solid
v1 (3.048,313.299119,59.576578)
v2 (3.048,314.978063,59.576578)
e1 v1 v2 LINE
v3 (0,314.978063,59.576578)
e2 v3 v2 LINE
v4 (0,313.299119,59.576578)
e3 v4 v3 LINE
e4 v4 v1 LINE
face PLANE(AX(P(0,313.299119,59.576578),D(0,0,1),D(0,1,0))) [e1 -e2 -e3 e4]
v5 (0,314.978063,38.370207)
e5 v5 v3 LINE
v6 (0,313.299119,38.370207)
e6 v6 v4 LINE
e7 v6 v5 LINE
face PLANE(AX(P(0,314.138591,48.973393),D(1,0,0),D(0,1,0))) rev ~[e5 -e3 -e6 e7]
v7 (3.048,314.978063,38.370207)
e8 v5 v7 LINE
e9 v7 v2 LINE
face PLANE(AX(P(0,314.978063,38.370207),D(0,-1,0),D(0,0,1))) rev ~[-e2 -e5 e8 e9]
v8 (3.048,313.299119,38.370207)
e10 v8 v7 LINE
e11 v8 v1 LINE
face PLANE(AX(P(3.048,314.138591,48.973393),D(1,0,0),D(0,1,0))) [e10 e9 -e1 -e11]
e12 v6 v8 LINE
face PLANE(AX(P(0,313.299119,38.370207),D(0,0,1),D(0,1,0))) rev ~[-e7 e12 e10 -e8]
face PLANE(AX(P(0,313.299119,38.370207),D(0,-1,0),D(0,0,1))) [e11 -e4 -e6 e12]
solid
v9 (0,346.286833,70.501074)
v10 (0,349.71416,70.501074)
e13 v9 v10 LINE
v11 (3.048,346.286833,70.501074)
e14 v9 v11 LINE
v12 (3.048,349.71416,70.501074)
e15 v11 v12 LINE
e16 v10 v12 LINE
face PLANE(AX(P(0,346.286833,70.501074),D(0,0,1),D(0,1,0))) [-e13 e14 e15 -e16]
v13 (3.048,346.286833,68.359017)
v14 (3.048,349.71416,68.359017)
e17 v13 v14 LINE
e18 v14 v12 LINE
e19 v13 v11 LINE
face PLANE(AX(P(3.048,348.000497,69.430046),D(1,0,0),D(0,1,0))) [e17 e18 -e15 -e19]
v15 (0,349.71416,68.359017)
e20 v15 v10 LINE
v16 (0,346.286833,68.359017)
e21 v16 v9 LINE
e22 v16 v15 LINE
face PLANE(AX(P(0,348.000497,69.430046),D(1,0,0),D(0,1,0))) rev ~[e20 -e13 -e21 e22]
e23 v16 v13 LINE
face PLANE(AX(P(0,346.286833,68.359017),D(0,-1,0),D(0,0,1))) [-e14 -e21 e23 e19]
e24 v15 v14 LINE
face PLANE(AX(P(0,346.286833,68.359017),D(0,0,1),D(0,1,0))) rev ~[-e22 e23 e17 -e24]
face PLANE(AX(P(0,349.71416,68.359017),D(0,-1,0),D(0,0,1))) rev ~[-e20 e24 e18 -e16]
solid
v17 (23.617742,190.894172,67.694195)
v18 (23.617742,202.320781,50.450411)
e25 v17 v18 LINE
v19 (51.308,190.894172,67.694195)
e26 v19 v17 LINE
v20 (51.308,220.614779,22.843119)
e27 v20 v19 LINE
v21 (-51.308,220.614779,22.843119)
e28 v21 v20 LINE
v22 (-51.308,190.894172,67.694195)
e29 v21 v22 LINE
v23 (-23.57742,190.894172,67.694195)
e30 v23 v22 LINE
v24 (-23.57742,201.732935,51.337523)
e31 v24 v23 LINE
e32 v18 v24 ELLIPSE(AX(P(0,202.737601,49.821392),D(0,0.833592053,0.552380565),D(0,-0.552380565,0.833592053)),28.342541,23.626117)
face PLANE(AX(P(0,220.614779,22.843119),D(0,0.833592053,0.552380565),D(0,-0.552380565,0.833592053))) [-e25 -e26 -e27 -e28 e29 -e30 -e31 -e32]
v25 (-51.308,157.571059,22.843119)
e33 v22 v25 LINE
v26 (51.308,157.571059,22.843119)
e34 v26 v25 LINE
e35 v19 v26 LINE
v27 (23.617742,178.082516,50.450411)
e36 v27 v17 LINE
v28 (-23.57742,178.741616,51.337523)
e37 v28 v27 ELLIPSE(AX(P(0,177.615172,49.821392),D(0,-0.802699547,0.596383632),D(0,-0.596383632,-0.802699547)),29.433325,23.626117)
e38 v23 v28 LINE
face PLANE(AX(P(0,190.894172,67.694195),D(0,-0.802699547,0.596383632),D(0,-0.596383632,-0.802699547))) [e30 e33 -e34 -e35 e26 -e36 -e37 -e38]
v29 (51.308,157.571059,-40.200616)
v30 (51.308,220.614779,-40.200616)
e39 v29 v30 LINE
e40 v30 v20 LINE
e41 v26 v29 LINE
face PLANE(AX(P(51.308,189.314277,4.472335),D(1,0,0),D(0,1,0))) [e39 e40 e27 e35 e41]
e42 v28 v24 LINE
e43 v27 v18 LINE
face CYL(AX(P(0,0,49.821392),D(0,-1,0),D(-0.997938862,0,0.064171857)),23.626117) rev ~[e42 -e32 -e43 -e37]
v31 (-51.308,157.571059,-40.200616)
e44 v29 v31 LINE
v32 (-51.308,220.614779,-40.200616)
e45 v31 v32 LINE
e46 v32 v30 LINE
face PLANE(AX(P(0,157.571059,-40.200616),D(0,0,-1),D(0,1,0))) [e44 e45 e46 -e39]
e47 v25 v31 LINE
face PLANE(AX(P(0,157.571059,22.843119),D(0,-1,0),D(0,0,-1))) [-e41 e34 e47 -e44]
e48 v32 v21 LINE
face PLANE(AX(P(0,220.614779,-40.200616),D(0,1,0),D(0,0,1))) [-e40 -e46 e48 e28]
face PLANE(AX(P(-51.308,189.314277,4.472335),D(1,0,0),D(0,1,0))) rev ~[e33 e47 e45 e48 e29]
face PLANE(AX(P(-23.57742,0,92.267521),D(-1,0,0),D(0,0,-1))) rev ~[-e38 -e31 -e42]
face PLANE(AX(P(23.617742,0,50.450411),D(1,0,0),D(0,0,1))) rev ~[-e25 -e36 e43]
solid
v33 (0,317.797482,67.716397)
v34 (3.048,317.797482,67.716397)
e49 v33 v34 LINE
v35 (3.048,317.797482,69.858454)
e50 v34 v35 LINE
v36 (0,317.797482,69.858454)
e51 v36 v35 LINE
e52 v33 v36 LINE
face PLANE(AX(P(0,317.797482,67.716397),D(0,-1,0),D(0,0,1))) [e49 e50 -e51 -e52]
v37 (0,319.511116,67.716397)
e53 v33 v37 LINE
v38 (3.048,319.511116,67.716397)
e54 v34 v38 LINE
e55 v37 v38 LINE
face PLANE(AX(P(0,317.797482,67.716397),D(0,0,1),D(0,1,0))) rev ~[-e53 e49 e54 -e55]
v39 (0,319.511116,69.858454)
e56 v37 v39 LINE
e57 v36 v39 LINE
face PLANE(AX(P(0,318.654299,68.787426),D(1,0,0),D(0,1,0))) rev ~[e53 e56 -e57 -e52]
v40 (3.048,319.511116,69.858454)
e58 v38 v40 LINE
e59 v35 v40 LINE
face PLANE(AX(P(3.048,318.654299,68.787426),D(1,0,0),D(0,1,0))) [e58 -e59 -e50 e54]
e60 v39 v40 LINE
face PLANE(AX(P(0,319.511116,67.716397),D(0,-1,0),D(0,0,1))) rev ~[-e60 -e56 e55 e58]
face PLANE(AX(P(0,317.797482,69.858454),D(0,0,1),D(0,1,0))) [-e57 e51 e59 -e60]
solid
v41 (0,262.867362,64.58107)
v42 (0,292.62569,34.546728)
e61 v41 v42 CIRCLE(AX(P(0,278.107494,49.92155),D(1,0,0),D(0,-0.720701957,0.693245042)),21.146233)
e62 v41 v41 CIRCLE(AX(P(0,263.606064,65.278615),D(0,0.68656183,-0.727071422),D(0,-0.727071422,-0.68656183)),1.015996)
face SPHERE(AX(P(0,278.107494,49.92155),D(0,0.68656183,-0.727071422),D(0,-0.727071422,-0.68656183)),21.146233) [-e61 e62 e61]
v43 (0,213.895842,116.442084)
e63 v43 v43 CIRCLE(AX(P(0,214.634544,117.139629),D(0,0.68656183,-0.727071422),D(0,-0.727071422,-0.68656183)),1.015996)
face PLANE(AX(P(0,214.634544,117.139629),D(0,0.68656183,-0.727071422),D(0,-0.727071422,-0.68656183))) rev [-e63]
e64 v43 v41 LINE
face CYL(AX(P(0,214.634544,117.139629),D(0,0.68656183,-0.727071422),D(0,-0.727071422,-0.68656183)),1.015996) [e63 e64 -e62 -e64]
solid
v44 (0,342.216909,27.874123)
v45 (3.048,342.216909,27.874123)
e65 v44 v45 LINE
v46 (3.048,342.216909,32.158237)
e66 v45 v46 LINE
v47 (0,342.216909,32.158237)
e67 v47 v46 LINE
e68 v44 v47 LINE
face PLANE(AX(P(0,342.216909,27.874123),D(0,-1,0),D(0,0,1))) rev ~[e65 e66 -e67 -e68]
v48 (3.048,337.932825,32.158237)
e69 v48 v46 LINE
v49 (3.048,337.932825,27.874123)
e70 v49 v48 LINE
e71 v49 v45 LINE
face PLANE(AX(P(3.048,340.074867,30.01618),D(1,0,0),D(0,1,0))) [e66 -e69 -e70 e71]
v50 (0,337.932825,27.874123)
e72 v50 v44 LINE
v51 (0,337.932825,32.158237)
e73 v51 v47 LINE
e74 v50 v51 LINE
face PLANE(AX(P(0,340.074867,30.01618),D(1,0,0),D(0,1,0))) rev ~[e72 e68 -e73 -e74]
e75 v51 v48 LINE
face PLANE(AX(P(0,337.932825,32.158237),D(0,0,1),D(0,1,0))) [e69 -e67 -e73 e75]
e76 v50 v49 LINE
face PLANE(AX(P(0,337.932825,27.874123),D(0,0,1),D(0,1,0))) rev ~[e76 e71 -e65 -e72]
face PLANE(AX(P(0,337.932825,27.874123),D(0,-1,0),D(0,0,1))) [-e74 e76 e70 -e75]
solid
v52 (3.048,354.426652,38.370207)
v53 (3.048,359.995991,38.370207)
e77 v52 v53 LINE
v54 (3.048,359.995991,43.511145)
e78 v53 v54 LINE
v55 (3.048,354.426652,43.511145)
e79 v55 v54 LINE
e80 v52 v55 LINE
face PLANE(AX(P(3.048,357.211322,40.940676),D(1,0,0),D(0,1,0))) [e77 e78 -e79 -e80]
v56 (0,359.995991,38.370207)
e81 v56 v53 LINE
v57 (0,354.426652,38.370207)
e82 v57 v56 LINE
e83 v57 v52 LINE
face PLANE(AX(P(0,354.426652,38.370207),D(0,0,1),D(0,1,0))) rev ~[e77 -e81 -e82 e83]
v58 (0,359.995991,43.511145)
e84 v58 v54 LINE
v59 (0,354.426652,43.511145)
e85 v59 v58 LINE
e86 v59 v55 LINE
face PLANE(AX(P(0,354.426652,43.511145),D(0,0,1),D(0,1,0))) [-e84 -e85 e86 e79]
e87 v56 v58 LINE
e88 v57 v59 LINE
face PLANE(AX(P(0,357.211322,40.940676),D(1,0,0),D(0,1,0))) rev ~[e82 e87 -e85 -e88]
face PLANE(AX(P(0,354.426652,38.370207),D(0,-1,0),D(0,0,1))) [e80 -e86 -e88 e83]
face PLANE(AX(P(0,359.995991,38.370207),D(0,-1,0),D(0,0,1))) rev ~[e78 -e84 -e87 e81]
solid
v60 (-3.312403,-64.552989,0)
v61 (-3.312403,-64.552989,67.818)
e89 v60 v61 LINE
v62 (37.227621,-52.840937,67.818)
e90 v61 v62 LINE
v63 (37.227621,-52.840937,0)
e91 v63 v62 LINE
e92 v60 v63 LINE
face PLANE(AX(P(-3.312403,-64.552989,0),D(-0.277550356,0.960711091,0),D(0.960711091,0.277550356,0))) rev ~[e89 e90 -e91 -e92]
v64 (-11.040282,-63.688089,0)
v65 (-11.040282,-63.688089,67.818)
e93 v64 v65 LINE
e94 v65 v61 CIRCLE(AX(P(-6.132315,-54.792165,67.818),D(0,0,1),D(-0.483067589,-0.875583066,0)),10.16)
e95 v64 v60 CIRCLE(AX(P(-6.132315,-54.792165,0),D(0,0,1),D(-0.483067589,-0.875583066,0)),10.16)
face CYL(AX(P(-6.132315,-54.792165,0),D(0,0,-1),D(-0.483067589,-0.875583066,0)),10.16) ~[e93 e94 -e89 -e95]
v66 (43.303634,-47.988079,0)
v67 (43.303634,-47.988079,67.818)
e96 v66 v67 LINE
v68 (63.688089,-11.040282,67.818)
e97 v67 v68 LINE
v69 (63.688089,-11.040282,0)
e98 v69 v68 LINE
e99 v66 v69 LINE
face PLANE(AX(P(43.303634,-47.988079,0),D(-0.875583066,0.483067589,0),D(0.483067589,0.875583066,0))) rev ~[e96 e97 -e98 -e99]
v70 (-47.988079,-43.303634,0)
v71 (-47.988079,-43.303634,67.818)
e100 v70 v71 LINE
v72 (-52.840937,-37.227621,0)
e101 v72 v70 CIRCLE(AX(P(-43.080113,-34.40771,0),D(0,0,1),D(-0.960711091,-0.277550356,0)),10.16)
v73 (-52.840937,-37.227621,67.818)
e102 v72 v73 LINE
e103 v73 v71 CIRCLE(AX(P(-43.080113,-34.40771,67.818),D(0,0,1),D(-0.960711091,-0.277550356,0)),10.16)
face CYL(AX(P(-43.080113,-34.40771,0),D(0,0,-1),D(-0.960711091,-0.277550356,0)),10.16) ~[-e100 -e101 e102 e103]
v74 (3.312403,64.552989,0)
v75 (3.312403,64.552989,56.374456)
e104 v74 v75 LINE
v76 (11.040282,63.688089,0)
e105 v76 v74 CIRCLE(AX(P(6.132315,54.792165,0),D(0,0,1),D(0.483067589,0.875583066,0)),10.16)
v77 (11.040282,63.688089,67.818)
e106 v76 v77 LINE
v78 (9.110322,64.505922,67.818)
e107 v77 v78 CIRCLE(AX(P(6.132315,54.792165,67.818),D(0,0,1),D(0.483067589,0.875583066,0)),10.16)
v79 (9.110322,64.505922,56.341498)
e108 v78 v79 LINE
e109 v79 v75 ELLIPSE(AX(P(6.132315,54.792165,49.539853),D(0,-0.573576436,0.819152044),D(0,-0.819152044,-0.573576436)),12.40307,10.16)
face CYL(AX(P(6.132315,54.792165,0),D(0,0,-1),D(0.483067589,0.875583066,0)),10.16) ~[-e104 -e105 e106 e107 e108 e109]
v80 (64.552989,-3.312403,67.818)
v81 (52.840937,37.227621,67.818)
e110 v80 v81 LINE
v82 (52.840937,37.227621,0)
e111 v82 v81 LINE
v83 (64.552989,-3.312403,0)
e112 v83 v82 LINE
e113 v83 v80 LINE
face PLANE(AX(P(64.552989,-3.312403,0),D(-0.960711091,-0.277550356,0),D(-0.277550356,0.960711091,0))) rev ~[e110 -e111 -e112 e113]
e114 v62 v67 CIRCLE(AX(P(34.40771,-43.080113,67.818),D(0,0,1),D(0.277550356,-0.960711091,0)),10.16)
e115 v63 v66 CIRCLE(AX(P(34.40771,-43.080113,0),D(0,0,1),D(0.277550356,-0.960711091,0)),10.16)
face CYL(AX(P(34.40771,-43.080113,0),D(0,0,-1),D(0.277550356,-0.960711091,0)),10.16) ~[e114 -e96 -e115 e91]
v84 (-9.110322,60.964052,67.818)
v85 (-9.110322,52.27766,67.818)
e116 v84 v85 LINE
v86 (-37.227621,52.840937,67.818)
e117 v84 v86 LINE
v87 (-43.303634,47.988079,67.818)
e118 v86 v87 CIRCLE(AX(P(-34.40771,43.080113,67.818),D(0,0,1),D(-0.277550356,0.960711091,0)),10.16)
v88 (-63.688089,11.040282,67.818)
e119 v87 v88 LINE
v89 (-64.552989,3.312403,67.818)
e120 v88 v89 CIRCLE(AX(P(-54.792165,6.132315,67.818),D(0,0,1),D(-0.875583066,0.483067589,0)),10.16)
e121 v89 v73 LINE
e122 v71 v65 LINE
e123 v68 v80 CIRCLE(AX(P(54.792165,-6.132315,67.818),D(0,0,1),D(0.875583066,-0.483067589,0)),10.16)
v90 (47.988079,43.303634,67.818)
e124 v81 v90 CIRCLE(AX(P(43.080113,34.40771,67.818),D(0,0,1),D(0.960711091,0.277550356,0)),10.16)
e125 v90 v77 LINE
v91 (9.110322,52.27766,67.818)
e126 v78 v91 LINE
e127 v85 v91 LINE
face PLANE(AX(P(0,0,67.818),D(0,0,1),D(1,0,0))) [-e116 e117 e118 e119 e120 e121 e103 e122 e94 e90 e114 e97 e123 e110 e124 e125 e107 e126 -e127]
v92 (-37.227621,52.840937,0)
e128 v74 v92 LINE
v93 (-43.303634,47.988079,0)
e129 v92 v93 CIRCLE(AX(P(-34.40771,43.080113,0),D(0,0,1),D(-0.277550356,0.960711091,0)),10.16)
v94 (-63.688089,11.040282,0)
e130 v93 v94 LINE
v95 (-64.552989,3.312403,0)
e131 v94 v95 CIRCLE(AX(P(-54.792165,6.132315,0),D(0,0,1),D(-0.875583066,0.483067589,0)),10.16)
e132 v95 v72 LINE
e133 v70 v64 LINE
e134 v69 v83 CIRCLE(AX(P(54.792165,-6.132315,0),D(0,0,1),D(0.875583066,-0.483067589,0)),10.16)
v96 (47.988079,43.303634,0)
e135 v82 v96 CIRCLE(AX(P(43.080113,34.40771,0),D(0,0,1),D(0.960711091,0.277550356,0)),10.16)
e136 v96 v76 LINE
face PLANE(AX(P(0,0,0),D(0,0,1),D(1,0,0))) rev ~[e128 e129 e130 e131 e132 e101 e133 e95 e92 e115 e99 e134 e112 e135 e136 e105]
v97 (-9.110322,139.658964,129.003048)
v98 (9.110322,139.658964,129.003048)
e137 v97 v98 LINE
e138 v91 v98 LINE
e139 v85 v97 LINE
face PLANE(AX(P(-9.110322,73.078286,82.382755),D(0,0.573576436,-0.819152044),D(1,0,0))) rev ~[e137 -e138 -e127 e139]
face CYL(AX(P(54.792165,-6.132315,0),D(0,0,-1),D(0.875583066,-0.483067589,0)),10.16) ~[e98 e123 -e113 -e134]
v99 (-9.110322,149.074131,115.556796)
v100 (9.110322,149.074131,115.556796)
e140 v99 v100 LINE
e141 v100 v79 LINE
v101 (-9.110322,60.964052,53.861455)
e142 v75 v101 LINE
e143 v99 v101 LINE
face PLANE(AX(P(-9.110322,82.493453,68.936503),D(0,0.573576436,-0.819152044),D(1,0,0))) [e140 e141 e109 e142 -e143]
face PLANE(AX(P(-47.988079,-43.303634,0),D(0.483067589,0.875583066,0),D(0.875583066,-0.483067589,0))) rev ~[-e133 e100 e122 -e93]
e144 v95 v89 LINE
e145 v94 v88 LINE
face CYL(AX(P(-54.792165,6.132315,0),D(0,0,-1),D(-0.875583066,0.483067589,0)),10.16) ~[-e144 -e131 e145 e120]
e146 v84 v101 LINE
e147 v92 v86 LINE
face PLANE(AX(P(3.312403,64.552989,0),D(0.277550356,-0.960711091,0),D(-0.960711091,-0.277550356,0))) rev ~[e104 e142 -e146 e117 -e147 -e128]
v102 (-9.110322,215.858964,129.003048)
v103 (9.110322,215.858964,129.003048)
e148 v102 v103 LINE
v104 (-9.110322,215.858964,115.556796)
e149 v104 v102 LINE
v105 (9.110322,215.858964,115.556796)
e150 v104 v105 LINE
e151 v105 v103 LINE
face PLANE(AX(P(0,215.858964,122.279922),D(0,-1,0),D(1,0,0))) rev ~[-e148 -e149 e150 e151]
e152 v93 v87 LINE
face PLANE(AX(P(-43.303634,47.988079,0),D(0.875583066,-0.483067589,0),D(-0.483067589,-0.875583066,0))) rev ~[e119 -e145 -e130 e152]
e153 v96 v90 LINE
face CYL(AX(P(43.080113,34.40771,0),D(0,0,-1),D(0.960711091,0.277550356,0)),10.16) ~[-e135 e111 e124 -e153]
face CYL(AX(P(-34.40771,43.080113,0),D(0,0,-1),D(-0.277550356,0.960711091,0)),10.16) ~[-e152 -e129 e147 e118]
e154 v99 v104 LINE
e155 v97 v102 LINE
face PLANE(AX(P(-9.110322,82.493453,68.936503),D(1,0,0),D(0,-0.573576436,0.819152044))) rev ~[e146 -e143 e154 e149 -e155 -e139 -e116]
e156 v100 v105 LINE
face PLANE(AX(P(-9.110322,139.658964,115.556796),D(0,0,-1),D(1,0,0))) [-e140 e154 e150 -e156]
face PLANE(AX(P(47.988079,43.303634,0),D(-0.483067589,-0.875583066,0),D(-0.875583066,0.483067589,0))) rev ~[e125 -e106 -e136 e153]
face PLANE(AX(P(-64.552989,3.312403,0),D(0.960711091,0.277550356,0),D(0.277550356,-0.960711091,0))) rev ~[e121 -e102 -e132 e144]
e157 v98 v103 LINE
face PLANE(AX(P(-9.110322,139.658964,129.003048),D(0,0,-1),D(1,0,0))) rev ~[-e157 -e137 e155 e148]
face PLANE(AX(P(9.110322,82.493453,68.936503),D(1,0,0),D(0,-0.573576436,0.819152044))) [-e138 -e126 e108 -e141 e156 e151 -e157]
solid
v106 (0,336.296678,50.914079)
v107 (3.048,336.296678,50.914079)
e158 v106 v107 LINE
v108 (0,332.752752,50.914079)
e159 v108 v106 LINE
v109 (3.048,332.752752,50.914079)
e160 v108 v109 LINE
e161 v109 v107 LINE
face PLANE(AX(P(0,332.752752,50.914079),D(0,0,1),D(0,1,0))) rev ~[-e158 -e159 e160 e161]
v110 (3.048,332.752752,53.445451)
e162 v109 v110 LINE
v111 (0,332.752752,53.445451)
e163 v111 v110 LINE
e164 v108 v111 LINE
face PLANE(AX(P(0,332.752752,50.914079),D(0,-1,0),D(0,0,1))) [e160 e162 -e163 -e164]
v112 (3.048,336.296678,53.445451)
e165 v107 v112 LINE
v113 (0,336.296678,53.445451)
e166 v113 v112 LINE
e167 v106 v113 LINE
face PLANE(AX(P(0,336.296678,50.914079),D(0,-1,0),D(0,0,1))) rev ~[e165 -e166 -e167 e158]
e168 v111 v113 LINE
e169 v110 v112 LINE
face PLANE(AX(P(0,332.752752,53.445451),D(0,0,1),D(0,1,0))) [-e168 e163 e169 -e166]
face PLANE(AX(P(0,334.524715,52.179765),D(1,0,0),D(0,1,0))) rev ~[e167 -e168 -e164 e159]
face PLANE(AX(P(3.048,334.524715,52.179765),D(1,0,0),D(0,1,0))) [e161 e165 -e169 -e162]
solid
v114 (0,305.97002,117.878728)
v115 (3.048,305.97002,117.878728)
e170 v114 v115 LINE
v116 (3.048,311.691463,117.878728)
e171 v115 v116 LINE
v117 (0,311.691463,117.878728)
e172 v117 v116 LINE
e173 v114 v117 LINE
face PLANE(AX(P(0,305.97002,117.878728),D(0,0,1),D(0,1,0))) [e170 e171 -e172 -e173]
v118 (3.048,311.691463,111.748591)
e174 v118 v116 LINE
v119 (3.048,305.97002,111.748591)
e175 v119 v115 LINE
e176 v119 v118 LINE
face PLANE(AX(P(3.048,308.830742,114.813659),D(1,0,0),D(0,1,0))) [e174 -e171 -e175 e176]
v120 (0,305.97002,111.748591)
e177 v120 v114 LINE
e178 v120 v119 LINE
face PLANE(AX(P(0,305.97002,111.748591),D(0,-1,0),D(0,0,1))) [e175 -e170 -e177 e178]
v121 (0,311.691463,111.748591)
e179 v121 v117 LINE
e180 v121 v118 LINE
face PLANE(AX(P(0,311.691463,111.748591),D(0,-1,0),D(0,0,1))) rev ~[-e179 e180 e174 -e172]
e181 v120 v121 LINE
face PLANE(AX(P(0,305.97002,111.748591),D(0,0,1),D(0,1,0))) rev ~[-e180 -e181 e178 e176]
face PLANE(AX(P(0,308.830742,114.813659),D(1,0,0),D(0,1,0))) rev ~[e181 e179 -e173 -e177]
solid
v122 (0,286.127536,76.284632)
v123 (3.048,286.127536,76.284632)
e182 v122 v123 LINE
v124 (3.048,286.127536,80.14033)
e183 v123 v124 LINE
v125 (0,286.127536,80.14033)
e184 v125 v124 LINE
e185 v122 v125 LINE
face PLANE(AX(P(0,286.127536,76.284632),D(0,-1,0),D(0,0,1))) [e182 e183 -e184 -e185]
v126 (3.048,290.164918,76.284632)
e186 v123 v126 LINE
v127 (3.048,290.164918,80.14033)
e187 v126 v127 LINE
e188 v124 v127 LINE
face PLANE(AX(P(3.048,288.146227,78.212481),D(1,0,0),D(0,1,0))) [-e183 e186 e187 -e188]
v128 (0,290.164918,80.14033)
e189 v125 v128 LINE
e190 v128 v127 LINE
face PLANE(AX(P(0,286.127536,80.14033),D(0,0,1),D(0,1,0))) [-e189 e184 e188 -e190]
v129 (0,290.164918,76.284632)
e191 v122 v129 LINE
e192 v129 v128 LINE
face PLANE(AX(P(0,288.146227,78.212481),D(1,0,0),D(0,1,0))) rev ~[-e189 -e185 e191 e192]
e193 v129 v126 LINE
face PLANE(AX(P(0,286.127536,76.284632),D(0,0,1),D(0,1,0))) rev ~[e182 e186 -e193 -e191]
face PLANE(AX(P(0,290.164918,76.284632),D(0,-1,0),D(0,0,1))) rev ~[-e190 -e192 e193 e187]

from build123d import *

# Parameters (mm, degrees)
F1_DEPTH      = 67.818
F4_W          = 18.2206444442
F4_H          = 16.4148422464
F5_DEPTH      = 35.052
F5_DEPTH_BACK = 81.28
F7_W          = 18.2206444442
F7_H          = 13.4462515828
F8_DEPTH      = 76.2
F12_DEPTH     = 51.308
F14_DEPTH     = 307.34
F15_W         = 3.5439252173
F15_H         = 2.5313720107
F16_DEPTH     = 3.048
F15_W_2       = 5.5693387985
F15_H_2       = 5.1409378648
F15_W_3       = 4.2840838432
F15_H_3       = 4.2841136456
F15_W_4       = 1.7136335373
F15_H_4       = 2.1420568228
F15_W_5       = 1.678943634
F15_H_5       = 21.2063714862
F15_W_6       = 4.0373813916
F15_H_6       = 3.8556978106
F15_W_7       = 3.4273266792
F15_W_8       = 5.7214427742
F15_H_7       = 6.1301365495


with BuildPart() as f1:
    # F0 (on Top) → F1 (new body)
    with BuildSketch(Plane.XY):
        with BuildLine():
            Line((-3.3124033153, -64.5529893688), (37.227621348, -52.8409373586))
            ThreePointArc((37.227621348, -52.8409373586), (40.7482742502, -51.0188053655), (43.3036336822, -47.9880793748))
            Line((43.3036336822, -47.9880793748), (63.6880886331, -11.0402816279))
            ThreePointArc((63.6880886331, -11.0402816279), (64.8891242859, -7.262362198), (64.5529893688, -3.3124033153))
            Line((64.5529893688, -3.3124033153), (52.8409373586, 37.227621348))
            ThreePointArc((52.8409373586, 37.227621348), (51.0188053655, 40.7482742502), (47.9880793748, 43.3036336822))
            Line((47.9880793748, 43.3036336822), (11.0402816279, 63.6880886331))
            ThreePointArc((11.0402816279, 63.6880886331), (7.262362198, 64.8891242859), (3.3124033153, 64.5529893688))
            Line((3.3124033153, 64.5529893688), (-37.227621348, 52.8409373586))
            ThreePointArc((-37.227621348, 52.8409373586), (-40.7482742502, 51.0188053655), (-43.3036336822, 47.9880793748))
            Line((-43.3036336822, 47.9880793748), (-63.6880886331, 11.0402816279))
            ThreePointArc((-63.6880886331, 11.0402816279), (-64.8891242859, 7.262362198), (-64.5529893688, 3.3124033153))
            Line((-64.5529893688, 3.3124033153), (-52.8409373586, -37.227621348))
            ThreePointArc((-52.8409373586, -37.227621348), (-51.0188053655, -40.7482742502), (-47.9880793748, -43.3036336822))
            Line((-47.9880793748, -43.3036336822), (-11.0402816279, -63.6880886331))
            ThreePointArc((-11.0402816279, -63.6880886331), (-7.262362198, -64.8891242859), (-3.3124033153, -64.5529893688))
        make_face()
    extrude(amount=F1_DEPTH)

    # F4 (on line) → F5 (join, two sides)
    with BuildSketch(Plane(origin=(0, 87.7434991713, 61.4386595487), x_dir=(1, 0, 0), z_dir=(0, -0.8191520443, -0.5735764364))) as f5_sk:
        with Locations((0, 17.3605981536)):
            Rectangle(F4_W, F4_H)
    extrude(amount=F5_DEPTH)
    extrude(f5_sk.sketch, amount=-F5_DEPTH_BACK)

    # F7 (on plane+point) → F8 (join)
    with BuildSketch(Plane.XZ.offset(-139.6589639498)):
        with Locations((0, 122.2799217629)):
            Rectangle(F7_W, F7_H)
    extrude(amount=-F8_DEPTH)


with BuildPart() as f10:
    # F9 (on Right) → F10 (revolve)
    with BuildSketch(Plane.YZ):
        with BuildLine():
            Line((213.895842433, 116.4420843124), (262.8673623017, 64.581070459))
            ThreePointArc((262.8673623017, 64.581070459), (263.0859847021, 35.038088053), (292.6256896875, 34.5467281301))
            Line((292.6256896875, 34.5467281301), (278.1074935259, 49.9215495422))
            Line((278.1074935259, 49.9215495422), (214.6345443587, 117.1396286399))
            Line((214.6345443587, 117.1396286399), (213.895842433, 116.4420843124))
        make_face()
    revolve(axis=Axis((0, 246.3710189423, 83.5305890911), (0, 0.6865618304, -0.7270714222)))


with BuildPart() as f12:
    # F11 (on Right) → F12 (new body, symmetric)
    with BuildSketch(Plane.YZ):
        Polygon((157.5710592777, -40.2006159251), (220.6147791832, -40.2006159251), (220.6147791832, 22.8431193803), (190.8941715956, 67.6941946149), (157.5710592777, 22.8431193803), align=None)
    extrude(amount=F12_DEPTH, both=True)

    # F13 (on Front) → F14 (cut)
    with BuildSketch(Plane.XZ):
        with BuildLine():
            Line((-23.5774199521, 92.2675209238), (-23.5774199521, 51.3375234856))
            ThreePointArc((-23.5774199521, 51.3375234856), (-0.4440142616, 26.1994476979), (23.6177416804, 50.4504108568))
            Line((23.6177416804, 50.4504108568), (23.6177416804, 86.8789901563))
            Line((23.6177416804, 86.8789901563), (-23.5774199521, 92.2675209238))
        make_face()
    extrude(amount=-F14_DEPTH, mode=Mode.SUBTRACT)


with BuildPart() as f16:
    # F15 (on Right) → F16 (new body)
    with BuildSketch(Plane.YZ):
        with Locations((334.5247149807, 52.1797649562)):
            Rectangle(F15_W, F15_H)
    extrude(amount=F16_DEPTH)


with BuildPart() as f16b:
    # F15 (on Right) → F16, piece 2 (new body)
    with BuildSketch(Plane.YZ):
        with Locations((357.2113215923, 40.9406758845)):
            Rectangle(F15_W_2, F15_H_2)
    extrude(amount=F16_DEPTH)


with BuildPart() as f16c:
    # F15 (on Right) → F16, piece 3 (new body)
    with BuildSketch(Plane.YZ):
        with Locations((340.0748670101, 30.0161801279)):
            Rectangle(F15_W_3, F15_H_3)
    extrude(amount=F16_DEPTH)


with BuildPart() as f16d:
    # F15 (on Right) → F16, piece 4 (new body)
    with BuildSketch(Plane.YZ):
        with Locations((318.6542987823, 68.7874257565)):
            Rectangle(F15_W_4, F15_H_4)
    extrude(amount=F16_DEPTH)


with BuildPart() as f16e:
    # F15 (on Right) → F16, piece 5 (new body)
    with BuildSketch(Plane.YZ):
        with Locations((314.1385912895, 48.9733926952)):
            Rectangle(F15_W_5, F15_H_5)
    extrude(amount=F16_DEPTH)


with BuildPart() as f16f:
    # F15 (on Right) → F16, piece 6 (new body)
    with BuildSketch(Plane.YZ):
        with Locations((288.1462270116, 78.2124809921)):
            Rectangle(F15_W_6, F15_H_6)
    extrude(amount=F16_DEPTH)


with BuildPart() as f16g:
    # F15 (on Right) → F16, piece 7 (new body)
    with BuildSketch(Plane.YZ):
        with Locations((348.0004966259, 69.4300457835)):
            Rectangle(F15_W_7, F15_H_4)
    extrude(amount=F16_DEPTH)


with BuildPart() as f16h:
    # F15 (on Right) → F16, piece 8 (new body)
    with BuildSketch(Plane.YZ):
        with Locations((308.8307416065, 114.8136593401)):
            Rectangle(F15_W_8, F15_H_7)
    extrude(amount=F16_DEPTH)


solid = Compound([f1.part, f10.part, f12.part, f16.part, f16b.part, f16c.part, f16d.part, f16e.part, f16f.part, f16g.part, f16h.part])
